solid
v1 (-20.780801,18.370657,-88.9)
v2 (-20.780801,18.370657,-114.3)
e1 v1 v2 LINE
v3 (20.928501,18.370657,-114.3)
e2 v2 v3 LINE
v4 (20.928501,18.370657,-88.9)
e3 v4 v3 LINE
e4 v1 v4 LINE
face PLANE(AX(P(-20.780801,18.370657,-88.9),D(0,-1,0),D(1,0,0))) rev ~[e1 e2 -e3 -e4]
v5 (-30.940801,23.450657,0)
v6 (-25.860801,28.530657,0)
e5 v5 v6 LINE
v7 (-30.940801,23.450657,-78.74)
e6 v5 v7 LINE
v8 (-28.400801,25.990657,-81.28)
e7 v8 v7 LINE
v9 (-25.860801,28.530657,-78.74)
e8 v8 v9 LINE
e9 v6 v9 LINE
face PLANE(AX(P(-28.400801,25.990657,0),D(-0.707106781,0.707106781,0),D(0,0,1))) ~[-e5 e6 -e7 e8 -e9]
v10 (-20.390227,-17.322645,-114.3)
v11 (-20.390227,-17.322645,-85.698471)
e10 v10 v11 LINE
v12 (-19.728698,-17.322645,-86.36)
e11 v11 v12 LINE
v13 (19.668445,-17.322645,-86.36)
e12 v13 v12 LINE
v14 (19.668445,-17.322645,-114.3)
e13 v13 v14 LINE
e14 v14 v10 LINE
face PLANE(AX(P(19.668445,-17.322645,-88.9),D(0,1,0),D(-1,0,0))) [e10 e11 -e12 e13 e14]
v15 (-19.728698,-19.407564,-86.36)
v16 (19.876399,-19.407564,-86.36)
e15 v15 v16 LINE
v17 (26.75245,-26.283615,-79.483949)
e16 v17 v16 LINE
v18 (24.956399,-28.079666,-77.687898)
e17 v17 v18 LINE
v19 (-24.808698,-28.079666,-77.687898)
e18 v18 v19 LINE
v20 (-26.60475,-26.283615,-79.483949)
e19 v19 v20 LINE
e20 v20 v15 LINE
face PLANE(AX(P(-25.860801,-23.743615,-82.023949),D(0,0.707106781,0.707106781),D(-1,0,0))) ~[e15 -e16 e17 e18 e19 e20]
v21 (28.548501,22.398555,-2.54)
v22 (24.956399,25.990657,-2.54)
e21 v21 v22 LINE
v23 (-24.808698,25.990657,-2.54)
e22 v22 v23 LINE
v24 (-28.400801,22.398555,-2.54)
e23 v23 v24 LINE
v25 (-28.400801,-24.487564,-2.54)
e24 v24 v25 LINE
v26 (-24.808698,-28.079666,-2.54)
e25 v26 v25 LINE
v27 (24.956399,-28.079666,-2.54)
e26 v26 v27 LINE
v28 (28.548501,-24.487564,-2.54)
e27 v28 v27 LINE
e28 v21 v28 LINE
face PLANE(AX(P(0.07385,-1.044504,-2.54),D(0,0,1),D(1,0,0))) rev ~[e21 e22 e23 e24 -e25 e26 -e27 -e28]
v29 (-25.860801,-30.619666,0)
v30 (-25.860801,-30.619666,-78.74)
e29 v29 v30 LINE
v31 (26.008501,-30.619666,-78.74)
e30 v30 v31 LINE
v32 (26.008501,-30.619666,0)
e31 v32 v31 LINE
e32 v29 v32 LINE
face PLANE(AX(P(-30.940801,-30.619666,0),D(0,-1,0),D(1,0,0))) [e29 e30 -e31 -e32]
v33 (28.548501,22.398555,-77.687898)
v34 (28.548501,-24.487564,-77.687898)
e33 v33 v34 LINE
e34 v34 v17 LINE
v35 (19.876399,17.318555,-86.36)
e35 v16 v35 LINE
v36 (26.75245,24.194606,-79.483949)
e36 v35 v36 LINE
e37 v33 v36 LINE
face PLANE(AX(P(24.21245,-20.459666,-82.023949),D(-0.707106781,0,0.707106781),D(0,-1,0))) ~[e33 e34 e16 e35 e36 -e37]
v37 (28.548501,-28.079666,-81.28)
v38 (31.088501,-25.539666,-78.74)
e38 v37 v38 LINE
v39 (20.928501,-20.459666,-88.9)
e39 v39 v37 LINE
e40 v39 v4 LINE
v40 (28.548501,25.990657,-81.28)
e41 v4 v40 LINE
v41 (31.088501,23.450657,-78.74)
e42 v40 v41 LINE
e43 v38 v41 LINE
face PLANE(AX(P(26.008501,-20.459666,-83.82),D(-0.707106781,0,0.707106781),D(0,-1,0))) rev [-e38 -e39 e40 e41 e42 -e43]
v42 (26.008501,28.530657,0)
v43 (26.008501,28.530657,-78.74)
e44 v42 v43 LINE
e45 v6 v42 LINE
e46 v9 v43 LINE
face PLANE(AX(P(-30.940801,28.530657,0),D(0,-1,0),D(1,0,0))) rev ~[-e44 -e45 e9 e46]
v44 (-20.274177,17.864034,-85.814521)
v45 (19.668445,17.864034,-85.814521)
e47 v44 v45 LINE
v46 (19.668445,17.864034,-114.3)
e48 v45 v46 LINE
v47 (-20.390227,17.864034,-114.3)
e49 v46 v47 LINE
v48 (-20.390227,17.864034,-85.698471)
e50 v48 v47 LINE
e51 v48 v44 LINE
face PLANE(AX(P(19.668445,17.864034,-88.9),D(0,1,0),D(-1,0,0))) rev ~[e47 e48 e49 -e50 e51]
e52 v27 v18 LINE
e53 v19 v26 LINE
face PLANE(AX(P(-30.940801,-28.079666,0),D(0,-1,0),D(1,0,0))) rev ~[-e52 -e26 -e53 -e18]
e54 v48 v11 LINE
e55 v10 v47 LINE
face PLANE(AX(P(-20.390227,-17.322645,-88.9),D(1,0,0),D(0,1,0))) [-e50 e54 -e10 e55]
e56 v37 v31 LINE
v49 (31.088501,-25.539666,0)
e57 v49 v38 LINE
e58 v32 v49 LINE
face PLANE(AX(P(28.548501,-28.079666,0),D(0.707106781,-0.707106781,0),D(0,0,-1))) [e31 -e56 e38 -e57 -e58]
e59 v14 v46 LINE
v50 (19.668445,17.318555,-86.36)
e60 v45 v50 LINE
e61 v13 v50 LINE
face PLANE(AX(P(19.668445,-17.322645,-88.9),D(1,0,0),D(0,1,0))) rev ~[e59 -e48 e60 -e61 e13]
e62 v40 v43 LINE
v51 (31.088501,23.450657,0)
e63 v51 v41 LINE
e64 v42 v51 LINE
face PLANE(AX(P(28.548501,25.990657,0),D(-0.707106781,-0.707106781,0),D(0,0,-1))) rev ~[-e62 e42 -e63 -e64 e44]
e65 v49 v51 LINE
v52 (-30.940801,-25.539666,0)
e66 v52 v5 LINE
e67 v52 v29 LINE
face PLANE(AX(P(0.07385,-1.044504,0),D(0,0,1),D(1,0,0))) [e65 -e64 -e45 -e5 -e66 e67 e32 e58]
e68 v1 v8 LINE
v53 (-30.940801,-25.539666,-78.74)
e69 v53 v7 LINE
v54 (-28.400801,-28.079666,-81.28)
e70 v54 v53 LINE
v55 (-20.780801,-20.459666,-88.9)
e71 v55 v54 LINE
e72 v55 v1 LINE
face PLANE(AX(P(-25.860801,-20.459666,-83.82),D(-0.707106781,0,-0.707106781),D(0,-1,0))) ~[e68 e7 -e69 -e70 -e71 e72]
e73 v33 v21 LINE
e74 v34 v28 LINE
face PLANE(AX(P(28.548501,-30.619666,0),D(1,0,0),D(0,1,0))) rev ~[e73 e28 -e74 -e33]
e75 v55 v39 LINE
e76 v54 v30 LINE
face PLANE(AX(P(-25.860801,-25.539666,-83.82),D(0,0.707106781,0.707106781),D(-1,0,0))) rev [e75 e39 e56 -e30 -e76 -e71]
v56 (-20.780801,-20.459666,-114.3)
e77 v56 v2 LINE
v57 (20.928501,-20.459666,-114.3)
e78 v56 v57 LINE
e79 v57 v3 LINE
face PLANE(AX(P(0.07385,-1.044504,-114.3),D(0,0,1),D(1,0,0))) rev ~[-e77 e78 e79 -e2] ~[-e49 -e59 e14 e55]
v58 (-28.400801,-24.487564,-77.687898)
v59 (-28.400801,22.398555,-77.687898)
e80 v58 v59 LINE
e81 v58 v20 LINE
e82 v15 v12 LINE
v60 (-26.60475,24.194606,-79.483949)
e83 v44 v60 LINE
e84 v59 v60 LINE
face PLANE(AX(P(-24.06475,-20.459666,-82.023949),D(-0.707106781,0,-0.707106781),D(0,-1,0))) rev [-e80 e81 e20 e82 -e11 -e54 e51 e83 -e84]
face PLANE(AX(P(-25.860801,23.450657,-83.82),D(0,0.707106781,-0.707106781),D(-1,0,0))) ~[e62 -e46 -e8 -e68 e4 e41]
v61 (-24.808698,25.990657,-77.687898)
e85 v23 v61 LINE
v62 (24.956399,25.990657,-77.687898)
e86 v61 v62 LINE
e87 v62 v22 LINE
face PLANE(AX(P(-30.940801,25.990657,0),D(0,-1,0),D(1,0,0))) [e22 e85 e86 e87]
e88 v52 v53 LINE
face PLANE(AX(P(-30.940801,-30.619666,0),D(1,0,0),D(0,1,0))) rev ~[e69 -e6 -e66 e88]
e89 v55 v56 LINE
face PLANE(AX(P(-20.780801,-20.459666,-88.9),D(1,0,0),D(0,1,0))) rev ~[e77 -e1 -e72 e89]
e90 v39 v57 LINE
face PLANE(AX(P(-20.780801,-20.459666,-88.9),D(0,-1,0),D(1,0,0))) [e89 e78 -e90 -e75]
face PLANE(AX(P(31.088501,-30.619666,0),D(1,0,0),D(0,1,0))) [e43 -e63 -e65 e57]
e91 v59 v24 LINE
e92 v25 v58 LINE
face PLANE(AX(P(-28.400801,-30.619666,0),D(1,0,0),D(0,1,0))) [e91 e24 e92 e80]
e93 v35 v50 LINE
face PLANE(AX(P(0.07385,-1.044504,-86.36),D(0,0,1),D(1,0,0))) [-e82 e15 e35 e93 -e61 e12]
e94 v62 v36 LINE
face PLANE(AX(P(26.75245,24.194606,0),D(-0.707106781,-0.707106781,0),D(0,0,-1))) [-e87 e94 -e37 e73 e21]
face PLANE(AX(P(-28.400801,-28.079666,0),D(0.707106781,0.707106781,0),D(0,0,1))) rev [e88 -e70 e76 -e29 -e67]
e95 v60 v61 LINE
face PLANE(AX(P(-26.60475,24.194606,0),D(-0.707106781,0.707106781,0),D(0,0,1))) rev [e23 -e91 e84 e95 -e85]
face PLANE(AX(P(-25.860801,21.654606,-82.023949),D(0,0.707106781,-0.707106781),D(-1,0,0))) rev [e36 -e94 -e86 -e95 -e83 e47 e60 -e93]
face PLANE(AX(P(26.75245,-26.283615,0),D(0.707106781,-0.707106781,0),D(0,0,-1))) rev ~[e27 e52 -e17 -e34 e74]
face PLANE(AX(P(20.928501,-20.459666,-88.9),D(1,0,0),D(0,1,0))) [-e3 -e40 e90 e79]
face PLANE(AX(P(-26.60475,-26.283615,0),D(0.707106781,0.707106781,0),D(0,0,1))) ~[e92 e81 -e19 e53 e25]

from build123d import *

# Parameters (mm, degrees)
F0_W     = 62.0293021202
F0_H     = 59.1503232718
F1_DEPTH = 88.9
F2_W     = 40.0586724281
F2_H     = 35.1866781712
F3_DEPTH = 76.2
F4_SIZE  = 5.08
F5_SIZE  = 10.16
F6_T     = 2.54
F7_DEPTH = 25.4


# Not quite as in the source:
# - a shell that OpenCascade refuses in one call is made with other operations: the cavity is built on its own and cut out


with BuildPart() as f1:
    # F0 (on Top) → F1 (new body)
    with BuildSketch(Plane.XY):
        with Locations((0.0738501549, -1.0445043445)):
            Rectangle(F0_W, F0_H)
    extrude(amount=-F1_DEPTH)

    # F2 (on face) → F3 (cut, symmetric)
    with BuildSketch(Plane(origin=(0, 0, -88.9), x_dir=(1, 0, 0), z_dir=(0, 0, -1))):
        with Locations((-0.360891223, -0.2706944942)):
            Rectangle(F2_W, F2_H)
    extrude(amount=F3_DEPTH, both=True, mode=Mode.SUBTRACT)

    # F4
    f4_edges = [f1.edges().sort_by_distance(p)[0] for p in [
        (-30.940801, 28.530657, -44.45),
        (31.088501, 28.530657, -44.45),
        (31.088501, -30.619666, -44.45),
        (-30.940801, -30.619666, -44.45),
    ]]
    chamfer(f4_edges, length=F4_SIZE)

    # F5 (call 1 of 4: OpenCascade refuses the feature's edges together)
    f5_edges = [f1.edges().sort_by_distance(p)[0] for p in [
        (0.07385, -30.619666, -88.9),
    ]]
    chamfer(f5_edges, length=F5_SIZE)

    # F5#2 (call 2 of 4)
    f5_2_edges = [f1.edges().sort_by_distance(p)[0] for p in [
        (0.07385, 28.530657, -88.9),
    ]]
    chamfer(f5_2_edges, length=F5_SIZE)

    # F5#3 (call 3 of 4)
    f5_3_edges = [f1.edges().sort_by_distance(p)[0] for p in [
        (31.088501, -1.044504, -88.9),
    ]]
    chamfer(f5_3_edges, length=F5_SIZE)

    # F5#4 (call 4 of 4)
    f5_4_edges = [f1.edges().sort_by_distance(p)[0] for p in [
        (-30.940801, -1.044504, -88.9),
    ]]
    chamfer(f5_4_edges, length=F5_SIZE)

    # F6: shell of thickness 2.54, made by hand


with BuildPart() as f6_core1:
    # F6_t2: copy of F1
    add(f1.part)

    # the walls: a layer under each face that stays
    f6_faces = [f6_core1.faces().sort_by_distance(p)[0] for p in [
        (0.0738501549, 23.4506572914, -83.82),
        (-17.8015650395, -17.6860714609, -88.9),
        (-25.8608009052, -1.0445043445, -83.82),
        (26.008501215, -1.0445043445, -83.82),
        (-28.4008009052, 25.9906572914, -40.64),
        (28.548501215, 25.9906572914, -40.64),
        (0.0738501549, 28.5306572914, -39.37),
        (0.0738501549, -25.5396659803, -83.82),
        (-30.9408009052, -1.0445043445, -39.37),
        (-28.4008009052, -28.0796659803, -40.64),
        (28.548501215, -28.0796659803, -40.64),
        (31.088501215, -1.0445043445, -39.37),
        (0.0738501549, -1.0445043445, 0),
        (0.0738501549, -30.6196659803, -39.37),
    ]]
    thicken(f6_faces, amount=-F6_T, mode=Mode.SUBTRACT)


with BuildPart() as f1_1:
    add(f1.part)

    # what is left inside the walls is the cavity
    f6_cavity = [f6_core1.part.solids().sort_by_distance(p)[0] for p in [
        (0.07385, 25.965257, -52.638598),
    ]]
    add(f6_cavity, mode=Mode.SUBTRACT)

    # F7 (add): a face of the model
    f7_faces = [f1_1.faces().sort_by_distance(p)[0] for p in [
        (0.0738501549, 18.3136708028, -88.9),
    ]]
    extrude(f7_faces, amount=F7_DEPTH)


solid = f1_1.part
